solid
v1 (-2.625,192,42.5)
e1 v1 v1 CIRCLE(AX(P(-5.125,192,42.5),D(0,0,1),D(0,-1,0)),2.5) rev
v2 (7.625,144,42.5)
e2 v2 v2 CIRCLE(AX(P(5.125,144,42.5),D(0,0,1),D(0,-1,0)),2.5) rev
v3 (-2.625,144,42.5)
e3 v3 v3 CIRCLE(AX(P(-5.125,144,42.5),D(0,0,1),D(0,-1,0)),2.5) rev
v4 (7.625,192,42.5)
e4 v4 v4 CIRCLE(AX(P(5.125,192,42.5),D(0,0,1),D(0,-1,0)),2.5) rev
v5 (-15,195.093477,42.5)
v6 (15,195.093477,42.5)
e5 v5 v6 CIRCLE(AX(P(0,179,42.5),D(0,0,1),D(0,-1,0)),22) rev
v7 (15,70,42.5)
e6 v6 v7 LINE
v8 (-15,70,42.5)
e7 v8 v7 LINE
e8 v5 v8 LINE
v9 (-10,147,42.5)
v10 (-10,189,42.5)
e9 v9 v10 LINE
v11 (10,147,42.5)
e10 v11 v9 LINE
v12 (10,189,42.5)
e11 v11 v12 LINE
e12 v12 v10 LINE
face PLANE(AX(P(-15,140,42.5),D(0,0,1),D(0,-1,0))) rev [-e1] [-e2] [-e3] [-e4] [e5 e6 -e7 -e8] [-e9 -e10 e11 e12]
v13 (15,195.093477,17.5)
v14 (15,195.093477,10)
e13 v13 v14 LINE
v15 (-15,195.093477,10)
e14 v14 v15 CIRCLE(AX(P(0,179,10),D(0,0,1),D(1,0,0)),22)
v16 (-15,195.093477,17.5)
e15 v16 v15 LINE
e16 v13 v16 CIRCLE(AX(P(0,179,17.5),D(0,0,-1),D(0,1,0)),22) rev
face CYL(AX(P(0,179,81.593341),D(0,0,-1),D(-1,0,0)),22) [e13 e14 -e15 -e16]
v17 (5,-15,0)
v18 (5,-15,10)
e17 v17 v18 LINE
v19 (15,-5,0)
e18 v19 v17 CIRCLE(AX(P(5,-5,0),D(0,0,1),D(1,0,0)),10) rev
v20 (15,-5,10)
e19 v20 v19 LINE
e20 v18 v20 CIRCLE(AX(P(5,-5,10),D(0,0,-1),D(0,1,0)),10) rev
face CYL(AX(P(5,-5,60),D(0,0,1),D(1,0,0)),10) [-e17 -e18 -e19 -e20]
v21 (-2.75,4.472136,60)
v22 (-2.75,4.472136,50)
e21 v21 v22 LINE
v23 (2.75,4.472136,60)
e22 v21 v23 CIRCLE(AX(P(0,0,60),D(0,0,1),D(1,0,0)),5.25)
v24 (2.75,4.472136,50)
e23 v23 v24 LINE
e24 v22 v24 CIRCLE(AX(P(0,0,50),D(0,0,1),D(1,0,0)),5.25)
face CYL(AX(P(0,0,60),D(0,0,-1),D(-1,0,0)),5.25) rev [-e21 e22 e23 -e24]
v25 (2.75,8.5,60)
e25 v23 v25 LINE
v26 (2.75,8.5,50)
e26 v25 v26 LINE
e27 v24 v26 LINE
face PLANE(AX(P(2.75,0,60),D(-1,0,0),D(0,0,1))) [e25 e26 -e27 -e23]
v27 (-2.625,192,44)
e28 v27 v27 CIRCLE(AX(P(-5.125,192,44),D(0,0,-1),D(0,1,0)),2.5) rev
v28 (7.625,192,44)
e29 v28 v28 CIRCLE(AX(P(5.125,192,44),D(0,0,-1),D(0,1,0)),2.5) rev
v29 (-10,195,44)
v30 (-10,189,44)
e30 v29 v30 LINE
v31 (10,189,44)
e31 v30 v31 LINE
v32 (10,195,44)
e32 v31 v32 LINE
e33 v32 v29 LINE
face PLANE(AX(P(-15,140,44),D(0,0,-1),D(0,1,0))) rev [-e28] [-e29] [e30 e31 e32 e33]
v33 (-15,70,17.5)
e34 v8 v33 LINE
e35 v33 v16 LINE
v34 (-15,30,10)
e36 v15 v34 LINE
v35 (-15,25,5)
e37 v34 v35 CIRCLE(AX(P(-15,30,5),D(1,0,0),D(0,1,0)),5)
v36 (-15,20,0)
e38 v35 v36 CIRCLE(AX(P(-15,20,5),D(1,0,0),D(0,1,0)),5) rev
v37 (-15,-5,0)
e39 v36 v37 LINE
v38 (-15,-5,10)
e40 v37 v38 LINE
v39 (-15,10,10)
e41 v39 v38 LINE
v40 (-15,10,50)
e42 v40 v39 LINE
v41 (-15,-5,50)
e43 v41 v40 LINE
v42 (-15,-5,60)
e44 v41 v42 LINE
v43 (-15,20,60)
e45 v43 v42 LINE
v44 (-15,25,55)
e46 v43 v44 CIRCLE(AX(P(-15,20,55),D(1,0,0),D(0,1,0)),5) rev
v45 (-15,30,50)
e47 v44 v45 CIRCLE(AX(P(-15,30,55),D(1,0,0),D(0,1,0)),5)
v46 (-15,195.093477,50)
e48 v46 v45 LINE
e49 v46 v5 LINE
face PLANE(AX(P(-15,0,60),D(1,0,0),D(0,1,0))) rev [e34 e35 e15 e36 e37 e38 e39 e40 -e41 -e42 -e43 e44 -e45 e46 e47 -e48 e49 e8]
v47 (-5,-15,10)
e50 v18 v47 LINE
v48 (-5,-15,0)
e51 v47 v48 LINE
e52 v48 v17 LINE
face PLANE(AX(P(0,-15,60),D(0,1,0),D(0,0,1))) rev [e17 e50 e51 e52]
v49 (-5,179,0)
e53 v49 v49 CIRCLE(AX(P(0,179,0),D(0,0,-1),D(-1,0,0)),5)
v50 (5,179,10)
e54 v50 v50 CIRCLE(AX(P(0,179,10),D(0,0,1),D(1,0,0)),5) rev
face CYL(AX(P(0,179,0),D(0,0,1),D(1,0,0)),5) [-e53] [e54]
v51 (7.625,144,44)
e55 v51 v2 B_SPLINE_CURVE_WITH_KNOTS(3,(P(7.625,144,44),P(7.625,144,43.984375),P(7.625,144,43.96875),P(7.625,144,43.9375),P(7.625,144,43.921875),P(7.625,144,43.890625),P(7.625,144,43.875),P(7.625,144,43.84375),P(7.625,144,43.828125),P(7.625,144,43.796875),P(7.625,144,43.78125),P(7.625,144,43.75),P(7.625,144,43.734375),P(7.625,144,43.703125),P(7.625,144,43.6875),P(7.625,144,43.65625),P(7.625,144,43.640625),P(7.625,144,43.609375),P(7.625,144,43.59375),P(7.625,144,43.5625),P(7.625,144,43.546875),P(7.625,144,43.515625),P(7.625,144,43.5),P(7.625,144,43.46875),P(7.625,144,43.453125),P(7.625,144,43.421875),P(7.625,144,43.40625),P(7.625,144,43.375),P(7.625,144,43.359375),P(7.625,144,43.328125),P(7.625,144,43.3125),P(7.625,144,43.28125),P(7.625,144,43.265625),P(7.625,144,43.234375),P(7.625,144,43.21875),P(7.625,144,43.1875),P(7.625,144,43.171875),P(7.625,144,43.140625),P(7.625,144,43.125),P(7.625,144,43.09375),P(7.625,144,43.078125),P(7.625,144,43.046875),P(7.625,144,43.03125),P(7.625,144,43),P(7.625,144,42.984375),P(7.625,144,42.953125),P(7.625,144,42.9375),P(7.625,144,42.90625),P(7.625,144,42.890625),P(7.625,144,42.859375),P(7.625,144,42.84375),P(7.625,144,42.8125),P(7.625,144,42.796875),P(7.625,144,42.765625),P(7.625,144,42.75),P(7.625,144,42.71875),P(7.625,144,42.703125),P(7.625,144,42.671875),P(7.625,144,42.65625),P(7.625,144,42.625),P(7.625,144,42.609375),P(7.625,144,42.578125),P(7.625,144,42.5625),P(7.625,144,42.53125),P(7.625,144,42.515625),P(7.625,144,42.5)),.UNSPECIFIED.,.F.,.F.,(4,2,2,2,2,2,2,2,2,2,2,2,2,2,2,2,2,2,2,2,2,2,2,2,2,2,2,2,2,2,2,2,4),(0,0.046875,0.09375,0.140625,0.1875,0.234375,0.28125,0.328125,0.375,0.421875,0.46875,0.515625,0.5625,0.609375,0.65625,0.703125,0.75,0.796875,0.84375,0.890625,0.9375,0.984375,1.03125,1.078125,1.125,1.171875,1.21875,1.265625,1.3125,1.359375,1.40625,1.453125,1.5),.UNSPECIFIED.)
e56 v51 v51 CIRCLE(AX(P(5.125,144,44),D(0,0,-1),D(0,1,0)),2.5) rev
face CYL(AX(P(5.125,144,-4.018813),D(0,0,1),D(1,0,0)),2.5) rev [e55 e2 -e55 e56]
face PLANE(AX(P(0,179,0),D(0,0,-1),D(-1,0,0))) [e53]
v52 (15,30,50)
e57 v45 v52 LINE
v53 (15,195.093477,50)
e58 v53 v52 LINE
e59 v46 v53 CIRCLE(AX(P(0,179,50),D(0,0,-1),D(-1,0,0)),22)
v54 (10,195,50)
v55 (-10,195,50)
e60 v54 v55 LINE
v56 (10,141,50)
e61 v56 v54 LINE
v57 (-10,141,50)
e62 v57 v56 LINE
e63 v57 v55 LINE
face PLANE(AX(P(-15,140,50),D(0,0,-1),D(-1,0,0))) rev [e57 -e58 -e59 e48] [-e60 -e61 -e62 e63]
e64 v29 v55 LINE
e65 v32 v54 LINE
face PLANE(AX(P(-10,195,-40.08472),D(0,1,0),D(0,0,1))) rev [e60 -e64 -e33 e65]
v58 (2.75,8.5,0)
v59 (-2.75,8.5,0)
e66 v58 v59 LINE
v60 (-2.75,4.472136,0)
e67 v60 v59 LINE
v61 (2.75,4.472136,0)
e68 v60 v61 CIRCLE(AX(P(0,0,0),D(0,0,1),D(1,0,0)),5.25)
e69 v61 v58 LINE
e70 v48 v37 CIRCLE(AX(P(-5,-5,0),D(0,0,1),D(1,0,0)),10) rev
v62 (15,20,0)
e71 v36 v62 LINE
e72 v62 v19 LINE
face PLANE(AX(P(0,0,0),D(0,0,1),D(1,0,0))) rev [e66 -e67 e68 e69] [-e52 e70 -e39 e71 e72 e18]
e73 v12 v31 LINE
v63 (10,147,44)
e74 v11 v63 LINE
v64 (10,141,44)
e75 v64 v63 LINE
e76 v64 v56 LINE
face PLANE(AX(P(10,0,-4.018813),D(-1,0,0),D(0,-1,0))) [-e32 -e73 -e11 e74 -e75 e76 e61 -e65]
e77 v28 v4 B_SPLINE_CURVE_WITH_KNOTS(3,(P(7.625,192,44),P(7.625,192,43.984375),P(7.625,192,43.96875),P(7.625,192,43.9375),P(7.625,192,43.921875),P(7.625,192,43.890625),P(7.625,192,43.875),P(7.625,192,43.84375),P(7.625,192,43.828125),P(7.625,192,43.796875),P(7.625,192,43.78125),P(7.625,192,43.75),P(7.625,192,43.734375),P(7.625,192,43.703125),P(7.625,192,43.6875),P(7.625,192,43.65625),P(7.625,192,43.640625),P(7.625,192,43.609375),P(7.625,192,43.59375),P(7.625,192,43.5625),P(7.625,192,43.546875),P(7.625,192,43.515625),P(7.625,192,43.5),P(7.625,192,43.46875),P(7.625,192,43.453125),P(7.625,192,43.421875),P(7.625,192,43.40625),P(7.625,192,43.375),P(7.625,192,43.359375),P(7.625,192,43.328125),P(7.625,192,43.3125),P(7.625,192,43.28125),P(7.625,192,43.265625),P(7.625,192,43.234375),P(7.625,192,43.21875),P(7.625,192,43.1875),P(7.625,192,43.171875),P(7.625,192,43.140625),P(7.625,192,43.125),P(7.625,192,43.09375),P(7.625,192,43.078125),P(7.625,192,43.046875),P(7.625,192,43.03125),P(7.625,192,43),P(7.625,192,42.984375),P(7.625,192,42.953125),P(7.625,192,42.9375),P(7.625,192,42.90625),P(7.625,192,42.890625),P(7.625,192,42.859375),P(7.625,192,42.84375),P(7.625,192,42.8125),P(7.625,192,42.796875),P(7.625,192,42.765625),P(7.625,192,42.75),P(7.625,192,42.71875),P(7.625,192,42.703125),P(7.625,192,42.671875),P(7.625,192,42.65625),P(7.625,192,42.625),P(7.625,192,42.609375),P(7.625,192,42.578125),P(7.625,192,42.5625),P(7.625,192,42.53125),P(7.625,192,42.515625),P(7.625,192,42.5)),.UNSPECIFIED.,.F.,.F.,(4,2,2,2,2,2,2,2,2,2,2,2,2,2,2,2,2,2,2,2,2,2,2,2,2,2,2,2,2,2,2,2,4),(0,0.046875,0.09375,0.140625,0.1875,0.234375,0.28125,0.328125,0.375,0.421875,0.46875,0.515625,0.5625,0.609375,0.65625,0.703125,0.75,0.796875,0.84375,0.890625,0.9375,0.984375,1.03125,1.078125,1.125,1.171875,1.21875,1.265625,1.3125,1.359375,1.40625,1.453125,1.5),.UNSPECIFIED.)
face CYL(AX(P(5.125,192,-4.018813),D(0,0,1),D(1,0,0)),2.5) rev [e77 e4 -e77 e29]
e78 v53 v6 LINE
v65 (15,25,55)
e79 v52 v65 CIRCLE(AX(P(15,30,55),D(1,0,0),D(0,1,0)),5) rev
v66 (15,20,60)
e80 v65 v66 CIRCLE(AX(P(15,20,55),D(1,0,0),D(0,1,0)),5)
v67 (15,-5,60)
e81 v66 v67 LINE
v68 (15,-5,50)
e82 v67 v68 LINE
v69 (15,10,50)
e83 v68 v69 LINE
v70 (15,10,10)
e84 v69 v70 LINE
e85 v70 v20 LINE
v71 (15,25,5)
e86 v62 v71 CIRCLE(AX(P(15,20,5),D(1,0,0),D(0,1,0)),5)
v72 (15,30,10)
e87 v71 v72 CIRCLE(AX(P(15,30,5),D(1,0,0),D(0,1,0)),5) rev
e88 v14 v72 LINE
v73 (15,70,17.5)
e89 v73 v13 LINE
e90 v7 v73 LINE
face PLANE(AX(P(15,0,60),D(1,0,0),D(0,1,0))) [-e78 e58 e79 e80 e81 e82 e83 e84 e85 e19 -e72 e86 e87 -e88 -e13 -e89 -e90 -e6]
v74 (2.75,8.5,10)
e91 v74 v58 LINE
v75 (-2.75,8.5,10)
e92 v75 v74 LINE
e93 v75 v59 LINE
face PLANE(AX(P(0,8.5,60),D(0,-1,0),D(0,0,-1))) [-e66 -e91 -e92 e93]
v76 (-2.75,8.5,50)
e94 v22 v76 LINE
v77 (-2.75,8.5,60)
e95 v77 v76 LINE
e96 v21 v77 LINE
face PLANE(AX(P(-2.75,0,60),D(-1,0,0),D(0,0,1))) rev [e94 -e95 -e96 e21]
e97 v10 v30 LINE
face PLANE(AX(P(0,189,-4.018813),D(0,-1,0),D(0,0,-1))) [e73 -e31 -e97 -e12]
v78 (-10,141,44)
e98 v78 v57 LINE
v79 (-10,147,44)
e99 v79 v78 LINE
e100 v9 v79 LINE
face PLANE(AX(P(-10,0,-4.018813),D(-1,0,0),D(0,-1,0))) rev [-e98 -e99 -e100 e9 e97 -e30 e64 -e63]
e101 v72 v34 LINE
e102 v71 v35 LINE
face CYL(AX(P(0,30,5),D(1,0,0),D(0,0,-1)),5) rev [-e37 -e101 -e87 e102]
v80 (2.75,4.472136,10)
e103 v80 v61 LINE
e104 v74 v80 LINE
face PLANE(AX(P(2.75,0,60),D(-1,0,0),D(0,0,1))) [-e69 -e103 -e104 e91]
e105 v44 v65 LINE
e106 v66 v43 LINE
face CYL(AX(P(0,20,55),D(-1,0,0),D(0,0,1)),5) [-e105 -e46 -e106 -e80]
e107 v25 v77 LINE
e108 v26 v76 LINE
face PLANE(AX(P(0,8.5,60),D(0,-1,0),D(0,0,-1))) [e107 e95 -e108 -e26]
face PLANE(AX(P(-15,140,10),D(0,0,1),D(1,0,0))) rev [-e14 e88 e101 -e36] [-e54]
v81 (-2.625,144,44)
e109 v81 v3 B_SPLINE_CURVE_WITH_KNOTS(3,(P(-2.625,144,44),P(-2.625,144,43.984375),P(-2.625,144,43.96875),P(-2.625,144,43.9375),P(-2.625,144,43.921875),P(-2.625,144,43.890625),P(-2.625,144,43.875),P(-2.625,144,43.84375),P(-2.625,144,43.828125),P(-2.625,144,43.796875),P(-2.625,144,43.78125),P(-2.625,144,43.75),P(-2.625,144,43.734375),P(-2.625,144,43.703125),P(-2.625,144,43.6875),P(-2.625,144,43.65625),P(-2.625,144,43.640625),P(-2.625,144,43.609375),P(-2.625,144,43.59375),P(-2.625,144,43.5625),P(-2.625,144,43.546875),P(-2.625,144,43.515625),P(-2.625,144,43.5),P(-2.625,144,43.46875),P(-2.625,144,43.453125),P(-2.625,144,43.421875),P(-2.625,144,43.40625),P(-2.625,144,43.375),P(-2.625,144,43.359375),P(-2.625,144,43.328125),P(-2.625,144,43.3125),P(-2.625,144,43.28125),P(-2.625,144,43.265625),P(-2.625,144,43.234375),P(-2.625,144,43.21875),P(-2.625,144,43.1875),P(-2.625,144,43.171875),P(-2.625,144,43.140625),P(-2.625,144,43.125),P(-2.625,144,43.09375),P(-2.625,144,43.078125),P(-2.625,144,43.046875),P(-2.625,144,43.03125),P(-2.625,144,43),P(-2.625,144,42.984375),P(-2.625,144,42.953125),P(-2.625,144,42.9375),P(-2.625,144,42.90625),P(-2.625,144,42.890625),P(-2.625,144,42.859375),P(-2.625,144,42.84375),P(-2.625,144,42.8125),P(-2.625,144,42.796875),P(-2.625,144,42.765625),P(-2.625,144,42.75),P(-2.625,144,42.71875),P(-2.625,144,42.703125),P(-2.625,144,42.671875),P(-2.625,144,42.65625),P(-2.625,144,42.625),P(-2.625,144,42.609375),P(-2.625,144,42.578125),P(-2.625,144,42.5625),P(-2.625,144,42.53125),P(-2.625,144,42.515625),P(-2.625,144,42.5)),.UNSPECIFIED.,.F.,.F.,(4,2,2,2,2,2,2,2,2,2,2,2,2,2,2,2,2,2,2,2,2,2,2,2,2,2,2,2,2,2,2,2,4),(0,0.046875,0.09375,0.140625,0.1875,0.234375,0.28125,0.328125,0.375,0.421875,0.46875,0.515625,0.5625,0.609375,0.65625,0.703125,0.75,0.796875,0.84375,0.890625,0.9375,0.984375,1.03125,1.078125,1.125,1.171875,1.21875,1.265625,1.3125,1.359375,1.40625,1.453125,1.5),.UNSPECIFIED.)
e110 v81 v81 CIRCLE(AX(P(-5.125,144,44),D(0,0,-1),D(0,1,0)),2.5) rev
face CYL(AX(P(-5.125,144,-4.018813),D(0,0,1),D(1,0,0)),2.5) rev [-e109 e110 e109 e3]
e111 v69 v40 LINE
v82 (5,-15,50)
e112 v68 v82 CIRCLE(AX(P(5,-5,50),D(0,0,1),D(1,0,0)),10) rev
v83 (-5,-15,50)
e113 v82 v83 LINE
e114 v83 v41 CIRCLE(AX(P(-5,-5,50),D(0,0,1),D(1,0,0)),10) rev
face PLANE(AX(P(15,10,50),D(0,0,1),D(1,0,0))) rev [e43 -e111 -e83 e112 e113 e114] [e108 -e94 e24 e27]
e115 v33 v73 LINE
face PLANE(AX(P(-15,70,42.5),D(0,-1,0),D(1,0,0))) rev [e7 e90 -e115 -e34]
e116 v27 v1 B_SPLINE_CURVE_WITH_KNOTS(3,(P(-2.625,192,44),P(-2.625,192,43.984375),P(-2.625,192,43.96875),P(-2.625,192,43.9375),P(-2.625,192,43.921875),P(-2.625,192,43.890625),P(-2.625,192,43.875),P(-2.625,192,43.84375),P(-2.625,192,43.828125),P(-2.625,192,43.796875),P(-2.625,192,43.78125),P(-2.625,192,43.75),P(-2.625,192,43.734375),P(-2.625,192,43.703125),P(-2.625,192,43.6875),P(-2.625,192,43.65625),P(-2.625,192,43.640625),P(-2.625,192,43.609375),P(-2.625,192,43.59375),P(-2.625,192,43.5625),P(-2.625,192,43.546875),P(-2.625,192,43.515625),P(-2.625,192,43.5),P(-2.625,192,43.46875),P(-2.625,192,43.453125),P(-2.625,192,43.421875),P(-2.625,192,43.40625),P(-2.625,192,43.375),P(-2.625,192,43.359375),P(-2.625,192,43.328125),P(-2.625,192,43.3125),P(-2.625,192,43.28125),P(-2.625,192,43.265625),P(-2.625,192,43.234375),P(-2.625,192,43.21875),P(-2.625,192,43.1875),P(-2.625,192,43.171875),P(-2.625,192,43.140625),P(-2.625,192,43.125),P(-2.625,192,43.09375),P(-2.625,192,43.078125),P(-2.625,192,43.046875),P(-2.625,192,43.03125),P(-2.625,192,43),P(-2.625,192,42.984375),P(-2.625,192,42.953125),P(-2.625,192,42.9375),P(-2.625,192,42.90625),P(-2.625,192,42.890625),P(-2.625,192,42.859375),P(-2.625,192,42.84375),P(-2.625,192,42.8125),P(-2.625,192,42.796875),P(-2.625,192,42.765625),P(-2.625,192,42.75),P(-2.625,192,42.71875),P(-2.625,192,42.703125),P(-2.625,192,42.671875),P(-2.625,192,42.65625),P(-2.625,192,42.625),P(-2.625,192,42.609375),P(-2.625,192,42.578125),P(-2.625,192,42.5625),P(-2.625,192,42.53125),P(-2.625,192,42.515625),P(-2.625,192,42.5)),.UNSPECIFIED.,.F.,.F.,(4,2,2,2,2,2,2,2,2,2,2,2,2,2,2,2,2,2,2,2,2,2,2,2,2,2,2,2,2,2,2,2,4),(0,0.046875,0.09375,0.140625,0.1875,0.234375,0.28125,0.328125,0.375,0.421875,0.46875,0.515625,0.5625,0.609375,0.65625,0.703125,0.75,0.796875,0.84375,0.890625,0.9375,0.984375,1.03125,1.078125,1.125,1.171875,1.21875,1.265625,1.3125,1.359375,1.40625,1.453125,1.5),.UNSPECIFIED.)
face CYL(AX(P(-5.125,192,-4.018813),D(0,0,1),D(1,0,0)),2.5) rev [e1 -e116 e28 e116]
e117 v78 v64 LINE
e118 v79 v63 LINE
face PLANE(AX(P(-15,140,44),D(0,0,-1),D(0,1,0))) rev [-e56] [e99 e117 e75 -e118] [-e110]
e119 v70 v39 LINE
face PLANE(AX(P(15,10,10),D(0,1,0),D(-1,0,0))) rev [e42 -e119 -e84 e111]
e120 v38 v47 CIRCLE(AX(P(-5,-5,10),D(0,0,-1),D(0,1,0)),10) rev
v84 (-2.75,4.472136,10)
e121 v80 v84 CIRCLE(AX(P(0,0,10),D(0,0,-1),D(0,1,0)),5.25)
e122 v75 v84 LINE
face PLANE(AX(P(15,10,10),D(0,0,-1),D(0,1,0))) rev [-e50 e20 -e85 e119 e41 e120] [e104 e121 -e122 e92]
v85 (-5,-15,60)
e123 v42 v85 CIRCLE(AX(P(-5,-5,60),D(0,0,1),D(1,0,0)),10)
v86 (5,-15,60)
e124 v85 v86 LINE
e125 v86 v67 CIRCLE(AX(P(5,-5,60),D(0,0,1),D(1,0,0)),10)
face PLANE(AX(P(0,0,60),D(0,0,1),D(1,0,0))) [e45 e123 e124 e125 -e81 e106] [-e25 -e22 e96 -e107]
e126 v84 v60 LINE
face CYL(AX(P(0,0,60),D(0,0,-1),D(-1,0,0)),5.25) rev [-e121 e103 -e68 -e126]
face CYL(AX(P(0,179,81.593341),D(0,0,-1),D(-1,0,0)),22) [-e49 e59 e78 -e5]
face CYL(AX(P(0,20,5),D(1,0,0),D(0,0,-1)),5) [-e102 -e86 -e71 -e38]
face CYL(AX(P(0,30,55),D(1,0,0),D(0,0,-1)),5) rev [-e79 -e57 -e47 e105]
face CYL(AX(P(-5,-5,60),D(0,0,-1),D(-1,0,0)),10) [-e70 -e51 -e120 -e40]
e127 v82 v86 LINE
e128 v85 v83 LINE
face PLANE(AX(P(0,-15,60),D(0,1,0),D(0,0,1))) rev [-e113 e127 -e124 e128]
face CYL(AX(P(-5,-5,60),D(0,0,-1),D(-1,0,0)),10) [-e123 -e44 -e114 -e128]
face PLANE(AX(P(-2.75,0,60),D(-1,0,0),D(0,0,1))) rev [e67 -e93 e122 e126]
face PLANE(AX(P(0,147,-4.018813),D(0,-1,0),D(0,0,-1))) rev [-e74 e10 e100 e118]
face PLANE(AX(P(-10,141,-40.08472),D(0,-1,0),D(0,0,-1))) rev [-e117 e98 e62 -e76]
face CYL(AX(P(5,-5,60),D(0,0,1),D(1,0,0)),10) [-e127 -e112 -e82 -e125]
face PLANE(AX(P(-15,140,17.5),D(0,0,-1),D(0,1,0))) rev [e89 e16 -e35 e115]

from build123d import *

# Parameters (mm, degrees)
SKETCH2_W               = 30
SKETCH2_H               = 30
BOSS_EXTRUDE1_DEPTH     = 60
FILLET1_R               = 10
SKETCH3_W               = 40
SKETCH3_H               = 25
CUT_EXTRUDE1_DEPTH      = 69.738635424
SKETCH6_W               = 30
SKETCH6_H               = 40
BOSS_EXTRUDE2_DEPTH     = 125
SKETCH7_W               = 30
SKETCH7_H               = 10
BOSS_EXTRUDE3_DEPTH     = 10
FILLET2_START           = -16
FILLET2_DEPTH           = 32
FILLET2_START_2         = -15
FILLET2_2_DEPTH         = 30
SKETCH8_W               = 25
SKETCH8_H               = 70
CUT_EXTRUDE2_DEPTH      = 156.241746963
SKETCH12_W              = 30
SKETCH12_H              = 7.5
BOSS_EXTRUDE4_DEPTH     = 65
CUT_EXTRUDE3_DEPTH      = 212.541958013
CUT_EXTRUDE3_DEPTH_BACK = 7.5
SKETCH13_R              = 2.5
SKETCH13_W              = 20
SKETCH13_H              = 42
SKETCH14_W              = 20
SKETCH14_H              = 54
CUT_EXTRUDE4_DEPTH      = 6
SKETCH15_R              = 5
BOSS_EXTRUDE5_DEPTH     = 10
CUT_EXTRUDE5_REACH      = 213.542


with BuildPart() as part:
    # Sketch2 → Boss-Extrude1 (new body)
    with BuildSketch(Plane.XY):
        Rectangle(SKETCH2_W, SKETCH2_H)
        with BuildLine():
            ThreePointArc((5.25, 0), (-2.561737691, -4.582575695), (-2.75, 4.472135955))
            Line((-2.75, 4.472135955), (-2.75, 8.5))
            Line((-2.75, 8.5), (0, 8.5))
            Line((0, 8.5), (2.75, 8.5))
            Line((2.75, 8.5), (2.75, 4.472135955))
            ThreePointArc((2.75, 4.472135955), (4.582575695, 2.561737691), (5.25, 0))
        make_face(mode=Mode.SUBTRACT)
    extrude(amount=BOSS_EXTRUDE1_DEPTH)

    # Fillet1
    fillet1_edges = [part.edges().sort_by_distance(p)[0] for p in [
        (15, -15, 30),
        (-15, -15, 30),
    ]]
    fillet(fillet1_edges, radius=FILLET1_R)

    # Sketch3 → Cut-Extrude1 (cut, through all)
    with BuildSketch(Plane.ZY.offset(15)):
        with Locations((30, -2.5)):
            Rectangle(SKETCH3_W, SKETCH3_H)
    extrude(amount=-CUT_EXTRUDE1_DEPTH, mode=Mode.SUBTRACT)

    # Sketch6 → Boss-Extrude2 (add)
    with BuildSketch(Plane(origin=(0, 15, 0), x_dir=(1, 0, 0), z_dir=(0, 1, 0))):
        with Locations((0, -30)):
            Rectangle(SKETCH6_W, SKETCH6_H)
    extrude(amount=BOSS_EXTRUDE2_DEPTH)

    # Sketch7 → Boss-Extrude3 (add)
    with BuildSketch(Plane(origin=(0, 15, 0), x_dir=(1, 0, 0), z_dir=(0, 1, 0))):
        with Locations((0, -5)):
            Rectangle(SKETCH7_W, SKETCH7_H)
        with Locations((0, -55)):
            Rectangle(SKETCH7_W, SKETCH7_H)
    extrude(amount=BOSS_EXTRUDE3_DEPTH)

    # Fillet2: read off the stored shape, not the designer's step
    # Fillet2 outline → Fillet2 (cut)
    with BuildSketch(Plane.YZ.offset(FILLET2_START)):
        with BuildLine():
            ThreePointArc((25, 5), (23.535533906, 1.464466094), (20, 0))
            Line((20, 0), (25, 0))
            Line((25, 0), (25, 5))
        make_face()
        with BuildLine():
            Line((25, 60), (20, 60))
            ThreePointArc((20, 60), (23.535533906, 58.535533906), (25, 55))
            Line((25, 55), (25, 60))
        make_face()
    extrude(amount=FILLET2_DEPTH, mode=Mode.SUBTRACT)

    # Fillet2 2 outline → Fillet2 2 (add)
    with BuildSketch(Plane.YZ.offset(FILLET2_START_2)):
        with BuildLine():
            Line((25, 10), (25, 5))
            ThreePointArc((25, 5), (26.464466094, 8.535533906), (30, 10))
            Line((30, 10), (25, 10))
        make_face()
        with BuildLine():
            ThreePointArc((30, 50), (26.464466094, 51.464466094), (25, 55))
            Line((25, 55), (25, 50))
            Line((25, 50), (30, 50))
        make_face()
    extrude(amount=FILLET2_2_DEPTH)

    # Sketch8 → Cut-Extrude2 (cut, through all)
    with BuildSketch(Plane(origin=(15, 0, 0), x_dir=(0, 0, -1), z_dir=(1, 0, 0))):
        with Locations((-30, 105)):
            Rectangle(SKETCH8_W, SKETCH8_H)
    extrude(amount=-CUT_EXTRUDE2_DEPTH, mode=Mode.SUBTRACT)

    # Sketch12 → Boss-Extrude4 (add)
    with BuildSketch(Plane(origin=(0, 140, 0), x_dir=(1, 0, 0), z_dir=(0, 1, 0))):
        with Locations((0, -13.75)):
            Rectangle(SKETCH12_W, SKETCH12_H)
        with Locations((0, -46.25)):
            Rectangle(SKETCH12_W, SKETCH12_H)
    extrude(amount=BOSS_EXTRUDE4_DEPTH)

    # Sketch13 → Cut-Extrude3 (cut, two sides: drawn at the far end of the back side and taken through both)
    with BuildSketch(Plane.XY.offset(50).offset(-CUT_EXTRUDE3_DEPTH_BACK)):
        with Locations((-5.125, 192)):
            Circle(SKETCH13_R)
        with Locations((5.125, 192)):
            Circle(SKETCH13_R)
        with Locations((-5.125, 144)):
            Circle(SKETCH13_R)
        with Locations((5.125, 144)):
            Circle(SKETCH13_R)
        with Locations((0, 168)):
            Rectangle(SKETCH13_W, SKETCH13_H)
    extrude(amount=CUT_EXTRUDE3_DEPTH + CUT_EXTRUDE3_DEPTH_BACK, mode=Mode.SUBTRACT)

    # Sketch14 → Cut-Extrude4 (cut)
    with BuildSketch(Plane.XY.offset(50)):
        with Locations((0, 168)):
            Rectangle(SKETCH14_W, SKETCH14_H)
    extrude(amount=-CUT_EXTRUDE4_DEPTH, mode=Mode.SUBTRACT)

    # Sketch15 → Boss-Extrude5 (add)
    with BuildSketch(Plane(origin=(0, 0, 10), x_dir=(-1, 0, 0), z_dir=(0, 0, -1))):
        with Locations(Location((0, 179, 0), (0, 0, 180))):
            Circle(SKETCH15_R)
    extrude(amount=BOSS_EXTRUDE5_DEPTH)

    # Cut-Extrude5: up to this face of the body (flat: up to its plane)
    cut_extrude5_end = Plane(part.part.faces().sort_by_distance((0, 104.420863309, 50))[0])
    # Sketch18 → Cut-Extrude5 (cut, up to the picked face)
    with BuildSketch(Plane(origin=(0, 0, 10), x_dir=(-1, 0, 0), z_dir=(0, 0, -1)), mode=Mode.PRIVATE) as cut_extrude5_sk1:
        with BuildLine():
            Line((-15, 195.093476939), (-15, 205))
            Line((-15, 205), (15, 205))
            Line((15, 205), (15, 195.093476939))
            ThreePointArc((15, 195.093476939), (0, 201), (-15, 195.093476939))
        make_face()
    cut_extrude5_tool1 = split(extrude(cut_extrude5_sk1.sketch, amount=-CUT_EXTRUDE5_REACH, mode=Mode.PRIVATE), bisect_by=cut_extrude5_end, keep=Keep.BOTH, mode=Mode.PRIVATE)
    add(cut_extrude5_tool1.solids().sort_by(Axis((0, 201.823225, 10), (0, 0, 1)))[0], mode=Mode.SUBTRACT)


solid = part.part
